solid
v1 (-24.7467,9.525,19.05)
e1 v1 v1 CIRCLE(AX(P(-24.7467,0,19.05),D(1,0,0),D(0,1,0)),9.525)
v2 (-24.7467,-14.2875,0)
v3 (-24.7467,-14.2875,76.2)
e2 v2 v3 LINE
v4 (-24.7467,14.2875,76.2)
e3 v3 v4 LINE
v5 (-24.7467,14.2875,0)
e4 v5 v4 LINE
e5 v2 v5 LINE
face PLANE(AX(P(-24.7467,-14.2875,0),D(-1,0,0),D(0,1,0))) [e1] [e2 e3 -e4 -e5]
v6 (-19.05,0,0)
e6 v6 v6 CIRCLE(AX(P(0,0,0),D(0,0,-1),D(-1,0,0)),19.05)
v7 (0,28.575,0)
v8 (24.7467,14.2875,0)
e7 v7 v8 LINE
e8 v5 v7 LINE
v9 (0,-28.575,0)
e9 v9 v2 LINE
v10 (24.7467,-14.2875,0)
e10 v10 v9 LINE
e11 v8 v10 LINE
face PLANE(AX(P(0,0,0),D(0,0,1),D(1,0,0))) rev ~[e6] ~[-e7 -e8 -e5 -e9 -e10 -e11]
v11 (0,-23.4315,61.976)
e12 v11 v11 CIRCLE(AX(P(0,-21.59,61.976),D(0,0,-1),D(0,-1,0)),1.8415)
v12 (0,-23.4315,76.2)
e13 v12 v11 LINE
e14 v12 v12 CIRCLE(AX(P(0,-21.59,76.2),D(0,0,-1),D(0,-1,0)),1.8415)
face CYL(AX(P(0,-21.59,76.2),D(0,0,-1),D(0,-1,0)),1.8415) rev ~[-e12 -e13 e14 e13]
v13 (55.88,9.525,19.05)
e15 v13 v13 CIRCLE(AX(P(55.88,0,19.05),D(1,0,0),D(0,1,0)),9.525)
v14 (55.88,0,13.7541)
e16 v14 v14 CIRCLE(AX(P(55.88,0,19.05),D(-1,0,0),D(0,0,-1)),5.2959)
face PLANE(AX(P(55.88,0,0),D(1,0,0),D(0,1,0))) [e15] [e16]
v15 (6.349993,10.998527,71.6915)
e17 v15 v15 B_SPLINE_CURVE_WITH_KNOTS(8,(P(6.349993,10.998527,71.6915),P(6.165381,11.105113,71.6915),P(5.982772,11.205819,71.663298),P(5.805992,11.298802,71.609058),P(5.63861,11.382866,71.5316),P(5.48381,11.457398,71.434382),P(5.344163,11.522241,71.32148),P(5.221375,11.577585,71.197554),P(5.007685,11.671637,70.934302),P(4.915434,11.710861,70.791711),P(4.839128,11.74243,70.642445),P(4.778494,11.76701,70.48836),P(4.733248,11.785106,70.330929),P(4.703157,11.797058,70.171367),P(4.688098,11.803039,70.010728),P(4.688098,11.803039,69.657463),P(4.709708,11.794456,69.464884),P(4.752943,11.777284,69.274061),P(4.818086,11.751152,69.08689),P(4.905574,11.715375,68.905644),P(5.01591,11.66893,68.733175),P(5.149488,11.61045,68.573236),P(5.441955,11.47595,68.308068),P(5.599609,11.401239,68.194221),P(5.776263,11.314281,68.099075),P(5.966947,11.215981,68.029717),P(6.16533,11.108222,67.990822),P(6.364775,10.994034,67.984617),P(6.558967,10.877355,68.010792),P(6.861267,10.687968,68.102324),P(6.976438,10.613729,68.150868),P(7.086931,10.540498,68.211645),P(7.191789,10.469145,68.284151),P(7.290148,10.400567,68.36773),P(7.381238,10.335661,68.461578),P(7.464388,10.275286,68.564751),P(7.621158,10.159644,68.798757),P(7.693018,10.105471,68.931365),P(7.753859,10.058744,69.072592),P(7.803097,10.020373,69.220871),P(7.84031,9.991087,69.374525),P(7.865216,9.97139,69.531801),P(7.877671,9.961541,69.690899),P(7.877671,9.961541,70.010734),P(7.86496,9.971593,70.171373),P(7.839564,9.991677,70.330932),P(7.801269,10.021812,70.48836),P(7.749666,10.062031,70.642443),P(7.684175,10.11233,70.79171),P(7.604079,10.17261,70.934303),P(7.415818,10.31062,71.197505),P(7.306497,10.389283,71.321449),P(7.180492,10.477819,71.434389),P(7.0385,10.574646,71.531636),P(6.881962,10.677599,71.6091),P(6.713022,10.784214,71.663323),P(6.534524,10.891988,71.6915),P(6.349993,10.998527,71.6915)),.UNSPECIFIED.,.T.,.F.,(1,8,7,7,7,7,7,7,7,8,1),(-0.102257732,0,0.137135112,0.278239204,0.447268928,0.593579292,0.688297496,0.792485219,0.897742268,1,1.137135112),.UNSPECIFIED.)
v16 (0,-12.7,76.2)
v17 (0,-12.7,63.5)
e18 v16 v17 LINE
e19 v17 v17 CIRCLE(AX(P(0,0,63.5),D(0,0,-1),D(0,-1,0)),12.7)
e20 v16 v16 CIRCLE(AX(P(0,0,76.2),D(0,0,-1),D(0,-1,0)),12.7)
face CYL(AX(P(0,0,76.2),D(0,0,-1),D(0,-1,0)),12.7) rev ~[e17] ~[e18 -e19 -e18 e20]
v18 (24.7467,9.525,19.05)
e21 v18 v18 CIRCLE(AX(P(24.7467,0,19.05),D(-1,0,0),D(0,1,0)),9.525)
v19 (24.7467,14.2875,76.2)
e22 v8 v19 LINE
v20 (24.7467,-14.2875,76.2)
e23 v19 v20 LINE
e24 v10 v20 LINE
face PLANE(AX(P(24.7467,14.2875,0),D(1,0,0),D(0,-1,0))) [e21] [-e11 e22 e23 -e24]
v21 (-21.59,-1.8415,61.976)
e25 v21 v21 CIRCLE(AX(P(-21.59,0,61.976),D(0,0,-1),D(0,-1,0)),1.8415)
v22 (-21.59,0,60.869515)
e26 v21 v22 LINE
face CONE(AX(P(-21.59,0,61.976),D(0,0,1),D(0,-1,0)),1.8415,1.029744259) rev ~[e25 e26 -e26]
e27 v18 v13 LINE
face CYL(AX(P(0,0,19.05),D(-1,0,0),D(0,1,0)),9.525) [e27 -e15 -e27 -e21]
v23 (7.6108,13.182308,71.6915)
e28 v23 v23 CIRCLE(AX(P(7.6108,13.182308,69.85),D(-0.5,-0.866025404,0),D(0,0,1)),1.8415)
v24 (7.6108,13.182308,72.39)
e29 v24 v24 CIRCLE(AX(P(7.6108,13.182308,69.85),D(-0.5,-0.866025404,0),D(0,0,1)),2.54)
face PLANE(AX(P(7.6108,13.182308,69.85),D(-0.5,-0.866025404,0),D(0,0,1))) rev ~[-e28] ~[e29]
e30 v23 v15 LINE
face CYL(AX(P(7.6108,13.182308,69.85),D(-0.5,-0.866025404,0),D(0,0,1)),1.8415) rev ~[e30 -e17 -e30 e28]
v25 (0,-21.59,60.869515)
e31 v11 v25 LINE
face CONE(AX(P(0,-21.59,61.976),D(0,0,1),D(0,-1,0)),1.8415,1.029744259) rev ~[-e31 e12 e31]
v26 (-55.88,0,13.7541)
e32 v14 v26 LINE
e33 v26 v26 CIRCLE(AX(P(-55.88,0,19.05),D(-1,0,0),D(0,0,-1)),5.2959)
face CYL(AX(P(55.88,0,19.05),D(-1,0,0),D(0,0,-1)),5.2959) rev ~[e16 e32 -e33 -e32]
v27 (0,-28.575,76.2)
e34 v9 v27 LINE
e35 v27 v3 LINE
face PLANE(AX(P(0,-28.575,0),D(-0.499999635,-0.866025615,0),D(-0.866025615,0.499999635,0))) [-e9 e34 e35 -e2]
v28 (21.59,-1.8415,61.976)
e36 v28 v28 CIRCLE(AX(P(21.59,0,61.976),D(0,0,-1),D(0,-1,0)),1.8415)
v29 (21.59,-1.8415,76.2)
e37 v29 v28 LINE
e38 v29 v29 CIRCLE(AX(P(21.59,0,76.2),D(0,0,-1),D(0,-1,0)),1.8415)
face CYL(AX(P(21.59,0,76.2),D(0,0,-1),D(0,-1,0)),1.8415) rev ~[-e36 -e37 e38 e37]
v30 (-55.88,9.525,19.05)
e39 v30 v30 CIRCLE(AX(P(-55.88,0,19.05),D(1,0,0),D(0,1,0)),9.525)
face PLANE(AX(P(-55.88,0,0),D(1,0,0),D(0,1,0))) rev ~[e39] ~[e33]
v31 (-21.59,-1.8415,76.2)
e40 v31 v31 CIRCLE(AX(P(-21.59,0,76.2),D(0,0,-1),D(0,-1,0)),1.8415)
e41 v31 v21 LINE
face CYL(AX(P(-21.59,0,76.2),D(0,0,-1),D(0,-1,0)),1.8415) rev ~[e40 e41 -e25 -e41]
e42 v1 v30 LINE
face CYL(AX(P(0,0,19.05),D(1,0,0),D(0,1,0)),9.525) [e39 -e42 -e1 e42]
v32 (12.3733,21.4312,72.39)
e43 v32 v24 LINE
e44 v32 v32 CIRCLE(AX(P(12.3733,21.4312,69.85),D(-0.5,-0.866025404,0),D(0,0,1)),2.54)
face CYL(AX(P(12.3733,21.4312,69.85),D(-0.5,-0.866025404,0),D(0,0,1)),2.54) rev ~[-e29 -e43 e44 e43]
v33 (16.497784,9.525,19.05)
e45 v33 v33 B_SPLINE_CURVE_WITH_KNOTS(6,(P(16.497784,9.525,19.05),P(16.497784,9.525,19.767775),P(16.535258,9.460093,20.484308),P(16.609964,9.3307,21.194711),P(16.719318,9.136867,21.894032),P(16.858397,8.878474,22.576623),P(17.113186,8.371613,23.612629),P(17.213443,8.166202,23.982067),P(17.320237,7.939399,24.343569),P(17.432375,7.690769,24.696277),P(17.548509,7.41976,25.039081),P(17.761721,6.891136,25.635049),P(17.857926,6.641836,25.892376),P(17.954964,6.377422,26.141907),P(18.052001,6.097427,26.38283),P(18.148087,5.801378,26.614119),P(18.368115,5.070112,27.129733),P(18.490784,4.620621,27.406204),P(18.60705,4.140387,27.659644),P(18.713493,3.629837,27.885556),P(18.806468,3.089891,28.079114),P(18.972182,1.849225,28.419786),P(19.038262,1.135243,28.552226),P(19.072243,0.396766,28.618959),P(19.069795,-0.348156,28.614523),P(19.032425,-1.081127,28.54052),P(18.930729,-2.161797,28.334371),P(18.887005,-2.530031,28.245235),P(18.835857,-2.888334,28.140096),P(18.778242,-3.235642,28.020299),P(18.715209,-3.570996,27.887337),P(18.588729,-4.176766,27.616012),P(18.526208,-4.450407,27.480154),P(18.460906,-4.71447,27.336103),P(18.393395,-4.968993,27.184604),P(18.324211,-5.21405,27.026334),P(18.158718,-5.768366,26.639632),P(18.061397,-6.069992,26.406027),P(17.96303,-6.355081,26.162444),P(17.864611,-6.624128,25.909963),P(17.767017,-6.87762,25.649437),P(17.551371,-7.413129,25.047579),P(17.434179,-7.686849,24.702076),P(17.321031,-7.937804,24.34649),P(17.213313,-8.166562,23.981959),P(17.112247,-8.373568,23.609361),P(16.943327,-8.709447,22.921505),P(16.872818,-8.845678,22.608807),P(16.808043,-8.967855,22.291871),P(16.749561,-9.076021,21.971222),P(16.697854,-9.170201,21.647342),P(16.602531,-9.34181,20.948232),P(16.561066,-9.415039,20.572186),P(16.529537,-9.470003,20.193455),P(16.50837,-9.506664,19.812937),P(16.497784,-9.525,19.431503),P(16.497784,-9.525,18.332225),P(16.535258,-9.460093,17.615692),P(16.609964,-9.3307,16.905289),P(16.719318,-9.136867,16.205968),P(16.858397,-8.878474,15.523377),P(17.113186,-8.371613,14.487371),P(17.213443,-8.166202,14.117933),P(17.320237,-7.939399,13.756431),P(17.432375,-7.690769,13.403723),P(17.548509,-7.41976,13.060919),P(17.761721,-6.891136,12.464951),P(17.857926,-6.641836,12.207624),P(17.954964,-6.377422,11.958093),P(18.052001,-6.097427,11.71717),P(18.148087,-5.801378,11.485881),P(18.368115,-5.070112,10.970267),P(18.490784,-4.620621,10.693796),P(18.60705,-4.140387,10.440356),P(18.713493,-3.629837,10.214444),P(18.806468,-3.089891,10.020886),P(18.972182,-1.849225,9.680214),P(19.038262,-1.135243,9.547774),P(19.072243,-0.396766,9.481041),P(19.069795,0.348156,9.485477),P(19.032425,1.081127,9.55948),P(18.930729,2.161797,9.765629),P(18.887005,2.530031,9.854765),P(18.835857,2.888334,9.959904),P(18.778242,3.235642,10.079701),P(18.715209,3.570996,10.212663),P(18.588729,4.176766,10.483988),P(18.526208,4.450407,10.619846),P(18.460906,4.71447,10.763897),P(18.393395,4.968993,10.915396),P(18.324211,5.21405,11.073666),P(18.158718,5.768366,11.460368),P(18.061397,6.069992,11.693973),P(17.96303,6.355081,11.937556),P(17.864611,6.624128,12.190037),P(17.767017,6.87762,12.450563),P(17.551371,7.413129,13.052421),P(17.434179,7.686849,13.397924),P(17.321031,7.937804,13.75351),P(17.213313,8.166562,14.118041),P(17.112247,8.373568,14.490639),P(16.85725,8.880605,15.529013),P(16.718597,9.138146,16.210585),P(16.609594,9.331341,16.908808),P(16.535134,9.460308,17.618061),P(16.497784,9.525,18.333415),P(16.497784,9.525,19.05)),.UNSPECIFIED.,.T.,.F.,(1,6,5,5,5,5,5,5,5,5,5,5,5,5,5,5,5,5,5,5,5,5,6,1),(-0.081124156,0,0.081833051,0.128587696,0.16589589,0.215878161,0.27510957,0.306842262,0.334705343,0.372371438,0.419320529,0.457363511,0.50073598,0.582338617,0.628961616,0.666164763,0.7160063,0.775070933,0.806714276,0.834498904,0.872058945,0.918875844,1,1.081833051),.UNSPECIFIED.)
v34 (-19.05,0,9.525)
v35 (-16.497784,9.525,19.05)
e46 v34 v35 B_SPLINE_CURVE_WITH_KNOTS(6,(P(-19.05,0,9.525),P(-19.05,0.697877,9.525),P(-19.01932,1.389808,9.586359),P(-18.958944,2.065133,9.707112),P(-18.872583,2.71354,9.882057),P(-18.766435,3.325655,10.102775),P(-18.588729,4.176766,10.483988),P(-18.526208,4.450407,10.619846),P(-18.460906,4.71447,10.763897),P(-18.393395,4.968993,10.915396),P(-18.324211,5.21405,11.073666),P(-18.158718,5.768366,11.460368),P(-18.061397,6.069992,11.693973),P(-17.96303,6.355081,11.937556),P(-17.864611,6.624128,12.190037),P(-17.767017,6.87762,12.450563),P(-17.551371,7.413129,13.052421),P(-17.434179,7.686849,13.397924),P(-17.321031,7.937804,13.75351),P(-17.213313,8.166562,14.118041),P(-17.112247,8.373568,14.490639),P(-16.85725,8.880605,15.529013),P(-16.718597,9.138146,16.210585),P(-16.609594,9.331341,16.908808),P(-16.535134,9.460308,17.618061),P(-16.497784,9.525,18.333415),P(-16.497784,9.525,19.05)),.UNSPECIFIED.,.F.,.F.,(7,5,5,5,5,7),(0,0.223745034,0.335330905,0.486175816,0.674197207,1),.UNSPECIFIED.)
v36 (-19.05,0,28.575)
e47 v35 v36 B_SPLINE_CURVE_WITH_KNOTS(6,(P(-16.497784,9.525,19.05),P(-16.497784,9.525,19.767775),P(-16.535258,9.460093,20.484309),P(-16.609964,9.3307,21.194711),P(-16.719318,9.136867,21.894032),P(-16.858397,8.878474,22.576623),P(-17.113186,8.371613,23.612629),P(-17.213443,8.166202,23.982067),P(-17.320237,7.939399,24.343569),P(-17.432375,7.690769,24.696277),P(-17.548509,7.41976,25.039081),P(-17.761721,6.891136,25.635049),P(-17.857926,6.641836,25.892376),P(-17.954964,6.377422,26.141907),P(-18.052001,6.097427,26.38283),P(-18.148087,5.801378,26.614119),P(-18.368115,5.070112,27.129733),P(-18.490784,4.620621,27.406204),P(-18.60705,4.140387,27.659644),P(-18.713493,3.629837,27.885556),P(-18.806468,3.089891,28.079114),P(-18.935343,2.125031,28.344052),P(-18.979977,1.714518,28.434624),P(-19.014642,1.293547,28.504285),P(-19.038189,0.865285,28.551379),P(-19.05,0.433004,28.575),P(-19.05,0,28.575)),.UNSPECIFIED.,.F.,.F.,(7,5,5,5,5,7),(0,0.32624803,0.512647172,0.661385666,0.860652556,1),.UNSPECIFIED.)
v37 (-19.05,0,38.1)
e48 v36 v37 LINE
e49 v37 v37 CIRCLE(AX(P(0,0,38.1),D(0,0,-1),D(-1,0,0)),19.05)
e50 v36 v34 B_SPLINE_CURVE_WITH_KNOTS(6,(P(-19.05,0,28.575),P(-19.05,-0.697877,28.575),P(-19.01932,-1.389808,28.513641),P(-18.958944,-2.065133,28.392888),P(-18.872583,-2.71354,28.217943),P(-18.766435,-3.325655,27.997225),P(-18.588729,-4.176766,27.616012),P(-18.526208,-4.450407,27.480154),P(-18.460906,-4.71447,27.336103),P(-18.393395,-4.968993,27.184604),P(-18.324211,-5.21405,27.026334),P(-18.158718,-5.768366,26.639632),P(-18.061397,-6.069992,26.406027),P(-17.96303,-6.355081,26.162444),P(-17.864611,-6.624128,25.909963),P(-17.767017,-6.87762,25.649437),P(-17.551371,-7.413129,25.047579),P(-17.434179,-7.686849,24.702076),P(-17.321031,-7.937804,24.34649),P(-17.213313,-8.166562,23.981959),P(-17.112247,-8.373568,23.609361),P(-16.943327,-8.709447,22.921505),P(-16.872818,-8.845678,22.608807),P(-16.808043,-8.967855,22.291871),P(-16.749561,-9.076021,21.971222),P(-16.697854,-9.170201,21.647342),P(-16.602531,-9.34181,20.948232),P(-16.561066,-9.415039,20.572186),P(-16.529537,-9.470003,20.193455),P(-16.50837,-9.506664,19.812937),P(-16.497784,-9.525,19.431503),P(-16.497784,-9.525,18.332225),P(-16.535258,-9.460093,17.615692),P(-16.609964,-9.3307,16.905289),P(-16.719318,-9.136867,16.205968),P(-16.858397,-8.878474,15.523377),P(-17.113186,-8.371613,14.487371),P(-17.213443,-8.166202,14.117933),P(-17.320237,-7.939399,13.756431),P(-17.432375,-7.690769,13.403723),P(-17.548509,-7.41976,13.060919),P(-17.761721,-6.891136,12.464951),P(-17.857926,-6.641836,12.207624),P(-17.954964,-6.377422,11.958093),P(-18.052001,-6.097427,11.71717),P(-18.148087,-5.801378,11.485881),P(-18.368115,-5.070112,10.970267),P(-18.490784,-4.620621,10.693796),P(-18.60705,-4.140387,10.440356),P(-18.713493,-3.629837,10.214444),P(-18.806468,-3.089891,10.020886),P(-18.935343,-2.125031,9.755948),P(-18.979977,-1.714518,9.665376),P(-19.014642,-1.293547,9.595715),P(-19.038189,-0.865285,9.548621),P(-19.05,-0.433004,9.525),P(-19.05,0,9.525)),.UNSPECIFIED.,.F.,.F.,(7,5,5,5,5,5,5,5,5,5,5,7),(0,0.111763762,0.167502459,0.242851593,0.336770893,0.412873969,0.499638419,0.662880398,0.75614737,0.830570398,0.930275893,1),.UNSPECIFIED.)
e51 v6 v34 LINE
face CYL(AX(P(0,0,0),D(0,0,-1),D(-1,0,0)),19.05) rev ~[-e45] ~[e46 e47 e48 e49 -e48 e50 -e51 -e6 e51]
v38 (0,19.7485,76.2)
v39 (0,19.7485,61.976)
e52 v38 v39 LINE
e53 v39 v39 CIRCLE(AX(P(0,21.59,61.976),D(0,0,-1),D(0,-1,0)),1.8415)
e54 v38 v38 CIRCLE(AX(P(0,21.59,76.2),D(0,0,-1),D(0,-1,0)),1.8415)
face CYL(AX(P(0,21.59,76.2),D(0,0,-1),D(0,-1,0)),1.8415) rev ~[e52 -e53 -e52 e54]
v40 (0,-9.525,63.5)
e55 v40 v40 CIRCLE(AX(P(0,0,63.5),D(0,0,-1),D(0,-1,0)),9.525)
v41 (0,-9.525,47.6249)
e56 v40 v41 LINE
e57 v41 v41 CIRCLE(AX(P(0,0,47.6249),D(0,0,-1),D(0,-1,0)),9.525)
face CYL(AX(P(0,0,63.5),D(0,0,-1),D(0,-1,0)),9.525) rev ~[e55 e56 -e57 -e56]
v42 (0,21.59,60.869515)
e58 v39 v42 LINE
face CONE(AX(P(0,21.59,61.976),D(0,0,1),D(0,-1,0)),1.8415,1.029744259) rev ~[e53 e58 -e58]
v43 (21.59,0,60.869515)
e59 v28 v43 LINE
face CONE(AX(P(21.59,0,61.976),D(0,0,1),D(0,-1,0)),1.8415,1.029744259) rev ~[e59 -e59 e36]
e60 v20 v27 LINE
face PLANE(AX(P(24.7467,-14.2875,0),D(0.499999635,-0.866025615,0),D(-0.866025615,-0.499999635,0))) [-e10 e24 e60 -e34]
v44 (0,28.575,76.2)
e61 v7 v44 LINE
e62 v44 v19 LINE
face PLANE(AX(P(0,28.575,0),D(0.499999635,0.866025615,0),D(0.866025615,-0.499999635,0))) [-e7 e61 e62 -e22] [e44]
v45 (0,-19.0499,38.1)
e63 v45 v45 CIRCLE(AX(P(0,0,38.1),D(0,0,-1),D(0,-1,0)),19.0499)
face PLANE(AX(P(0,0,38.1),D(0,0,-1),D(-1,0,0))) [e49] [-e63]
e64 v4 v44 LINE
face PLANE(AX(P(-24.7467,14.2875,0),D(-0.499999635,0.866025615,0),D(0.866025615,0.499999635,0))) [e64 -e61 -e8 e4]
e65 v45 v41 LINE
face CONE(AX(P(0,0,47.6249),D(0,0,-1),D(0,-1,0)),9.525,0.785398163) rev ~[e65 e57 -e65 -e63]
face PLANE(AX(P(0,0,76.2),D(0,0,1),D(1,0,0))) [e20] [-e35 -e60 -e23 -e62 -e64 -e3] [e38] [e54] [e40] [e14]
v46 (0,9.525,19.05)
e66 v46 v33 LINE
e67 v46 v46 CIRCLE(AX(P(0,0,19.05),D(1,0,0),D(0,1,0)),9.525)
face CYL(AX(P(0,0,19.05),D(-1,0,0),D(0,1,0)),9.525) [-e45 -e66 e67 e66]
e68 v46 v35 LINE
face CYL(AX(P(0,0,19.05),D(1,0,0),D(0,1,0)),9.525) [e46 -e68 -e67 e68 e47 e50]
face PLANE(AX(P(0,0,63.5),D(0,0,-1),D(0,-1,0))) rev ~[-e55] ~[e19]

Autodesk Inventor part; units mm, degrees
ref_plane "YZ Plane" through (0, 0, 0) normal (1, 0, 0) x (0, 1, 0)
ref_plane "XZ Plane" through (0, 0, 0) normal (0, 1, 0) x (-1, 0, 0)
ref_plane "XY Plane" through (0, 0, 0) normal (0, 0, 1) x (1, 0, 0)
sketch "Boceto1" plane through (0, 0, 0) normal (0, 0, 1) x (1, 0, 0)
  circle A0 centre (0, 0) radius 28.575 construction
  line L0 (0, 28.575) -> (24.7467, 14.2875)
  line L1 (24.7467, 14.2875) -> (24.7467, -14.2875)
  line L2 (24.7467, -14.2875) -> (0, -28.575)
  line L3 (0, -28.575) -> (-24.7467, -14.2875)
  line L4 (-24.7467, -14.2875) -> (-24.7467, 14.2875)
  line L5 (-24.7467, 14.2875) -> (0, 28.575)
  circle A1 centre (0, 0) radius 21.59 construction
  dimension "d1" = 57.15
  dimension "d2" = 43.18
extrude "Hexagono" add sketch "Boceto1" along normal blind 76.2
sketch "Boceto2" plane through (0, 0, 76.2) normal (0, 0, 1) x (1, 0, 0)
  circle A0 centre (0, 0) radius 21.59 construction
  point P0 (0, 21.59)
  point P1 (21.59, 0)
  point P2 (-21.59, 0)
  point P3 (0, -21.59)
  dimension "d5" = 43.18
hole "Tornillos" at (0, 21.59, 76.2) at (21.59, 0, 76.2) at (-21.59, 0, 76.2) at (0, -21.59, 76.2) direction (0, 0, -1) diameter 3.683 depth 14.224 tip angle 118 thread size "10-24 UNC" class "2B" standard "ANSI Unified Screw Threads"
sketch "Boceto3" plane through (0, 0, 0) normal (0, 0, -1) x (-1, 0, 0)
  circle A0 centre (0, 0) radius 19.05
  dimension "d13" = 38.1
extrude "Extrusión2" cut sketch "Boceto3" against normal blind 38.1
sketch "Boceto5" plane through (0, 0, 76.2) normal (0, 0, 1) x (1, 0, 0)
  point P0 (0, 0)
  point P1 (0, 0)
hole "Agujero3" at (0, 0, 76.2) direction (0, 0, -1) diameter 19.05 depth 38.1 counterbore diameter 25.4 counterbore depth 12.7
chamfer "Chaflán2" distance 9.525 angle 45 1 edges at (0, 9.525, 38.1) measured on face at (-15.6673, -1.9024, 38.1)
sketch "Boceto6" plane through (0, 0, 0) normal (1, 0, 0) x (0, 1, 0)
  line L0 (-14.2875, 0) -> (14.2875, 0) projected
  line L1 (-28.575, 0) -> (-28.575, 76.2) projected
  line L2 (28.575, 0) -> (28.575, 76.2) projected
  circle A0 centre (0, 19.05) radius 9.525
  point P0 (0, 0)
  dimension "d36" = 19.05
  dimension "d37" = 57.15
  dimension "d38" = 28.575
  dimension "d39" = 19.05
extrude "Extrusión3" add sketch "Boceto6" along normal mid plane 111.76
sketch "Boceto7" plane through (55.88, 0, 19.05) normal (1, 0, 0) x (0, 0, -1)
  point P0 (19.05, 0)
  point P1 (0, 0)
hole "Agujero4" at (55.88, 0, 19.05) direction (-1, 0, 0) diameter 10.5918 end through all thread size "1/2-13 UNC" class "2B" standard "ANSI Unified Screw Threads"
sketch "Boceto8" plane through (0, 28.575, 76.2) normal (0.5, 0.8660254, 0) x (0.8660254, -0.5, 0)
  line L0 (28.575, 0) -> (0, 0) projected
  line L1 (42.8625, 76.2) -> (42.8625, 0) projected
  line L2 (-14.2875, 76.2) -> (-14.2875, 0) projected
  point P0 (14.2875, 76.2)
  point P1 (14.2875, 6.35)
  dimension "d49" = 6.35
  dimension "d50" = 57.15
  dimension "d51" = 28.575
hole "Agujero5" at (12.3733, 21.4312, 69.85) direction (-0.5, -0.8660254, 0) diameter 3.683 depth 14.9352 counterbore diameter 5.08 counterbore depth 9.525 thread size "10-24 UNC" class "2B" standard "ANSI Unified Screw Threads"
equation "\"d38\" = 0.5 * d37"
equation "\"d51\" = 0.5 * d50"
properties part number "Válvula A01209499" material "Acero, fundido"
